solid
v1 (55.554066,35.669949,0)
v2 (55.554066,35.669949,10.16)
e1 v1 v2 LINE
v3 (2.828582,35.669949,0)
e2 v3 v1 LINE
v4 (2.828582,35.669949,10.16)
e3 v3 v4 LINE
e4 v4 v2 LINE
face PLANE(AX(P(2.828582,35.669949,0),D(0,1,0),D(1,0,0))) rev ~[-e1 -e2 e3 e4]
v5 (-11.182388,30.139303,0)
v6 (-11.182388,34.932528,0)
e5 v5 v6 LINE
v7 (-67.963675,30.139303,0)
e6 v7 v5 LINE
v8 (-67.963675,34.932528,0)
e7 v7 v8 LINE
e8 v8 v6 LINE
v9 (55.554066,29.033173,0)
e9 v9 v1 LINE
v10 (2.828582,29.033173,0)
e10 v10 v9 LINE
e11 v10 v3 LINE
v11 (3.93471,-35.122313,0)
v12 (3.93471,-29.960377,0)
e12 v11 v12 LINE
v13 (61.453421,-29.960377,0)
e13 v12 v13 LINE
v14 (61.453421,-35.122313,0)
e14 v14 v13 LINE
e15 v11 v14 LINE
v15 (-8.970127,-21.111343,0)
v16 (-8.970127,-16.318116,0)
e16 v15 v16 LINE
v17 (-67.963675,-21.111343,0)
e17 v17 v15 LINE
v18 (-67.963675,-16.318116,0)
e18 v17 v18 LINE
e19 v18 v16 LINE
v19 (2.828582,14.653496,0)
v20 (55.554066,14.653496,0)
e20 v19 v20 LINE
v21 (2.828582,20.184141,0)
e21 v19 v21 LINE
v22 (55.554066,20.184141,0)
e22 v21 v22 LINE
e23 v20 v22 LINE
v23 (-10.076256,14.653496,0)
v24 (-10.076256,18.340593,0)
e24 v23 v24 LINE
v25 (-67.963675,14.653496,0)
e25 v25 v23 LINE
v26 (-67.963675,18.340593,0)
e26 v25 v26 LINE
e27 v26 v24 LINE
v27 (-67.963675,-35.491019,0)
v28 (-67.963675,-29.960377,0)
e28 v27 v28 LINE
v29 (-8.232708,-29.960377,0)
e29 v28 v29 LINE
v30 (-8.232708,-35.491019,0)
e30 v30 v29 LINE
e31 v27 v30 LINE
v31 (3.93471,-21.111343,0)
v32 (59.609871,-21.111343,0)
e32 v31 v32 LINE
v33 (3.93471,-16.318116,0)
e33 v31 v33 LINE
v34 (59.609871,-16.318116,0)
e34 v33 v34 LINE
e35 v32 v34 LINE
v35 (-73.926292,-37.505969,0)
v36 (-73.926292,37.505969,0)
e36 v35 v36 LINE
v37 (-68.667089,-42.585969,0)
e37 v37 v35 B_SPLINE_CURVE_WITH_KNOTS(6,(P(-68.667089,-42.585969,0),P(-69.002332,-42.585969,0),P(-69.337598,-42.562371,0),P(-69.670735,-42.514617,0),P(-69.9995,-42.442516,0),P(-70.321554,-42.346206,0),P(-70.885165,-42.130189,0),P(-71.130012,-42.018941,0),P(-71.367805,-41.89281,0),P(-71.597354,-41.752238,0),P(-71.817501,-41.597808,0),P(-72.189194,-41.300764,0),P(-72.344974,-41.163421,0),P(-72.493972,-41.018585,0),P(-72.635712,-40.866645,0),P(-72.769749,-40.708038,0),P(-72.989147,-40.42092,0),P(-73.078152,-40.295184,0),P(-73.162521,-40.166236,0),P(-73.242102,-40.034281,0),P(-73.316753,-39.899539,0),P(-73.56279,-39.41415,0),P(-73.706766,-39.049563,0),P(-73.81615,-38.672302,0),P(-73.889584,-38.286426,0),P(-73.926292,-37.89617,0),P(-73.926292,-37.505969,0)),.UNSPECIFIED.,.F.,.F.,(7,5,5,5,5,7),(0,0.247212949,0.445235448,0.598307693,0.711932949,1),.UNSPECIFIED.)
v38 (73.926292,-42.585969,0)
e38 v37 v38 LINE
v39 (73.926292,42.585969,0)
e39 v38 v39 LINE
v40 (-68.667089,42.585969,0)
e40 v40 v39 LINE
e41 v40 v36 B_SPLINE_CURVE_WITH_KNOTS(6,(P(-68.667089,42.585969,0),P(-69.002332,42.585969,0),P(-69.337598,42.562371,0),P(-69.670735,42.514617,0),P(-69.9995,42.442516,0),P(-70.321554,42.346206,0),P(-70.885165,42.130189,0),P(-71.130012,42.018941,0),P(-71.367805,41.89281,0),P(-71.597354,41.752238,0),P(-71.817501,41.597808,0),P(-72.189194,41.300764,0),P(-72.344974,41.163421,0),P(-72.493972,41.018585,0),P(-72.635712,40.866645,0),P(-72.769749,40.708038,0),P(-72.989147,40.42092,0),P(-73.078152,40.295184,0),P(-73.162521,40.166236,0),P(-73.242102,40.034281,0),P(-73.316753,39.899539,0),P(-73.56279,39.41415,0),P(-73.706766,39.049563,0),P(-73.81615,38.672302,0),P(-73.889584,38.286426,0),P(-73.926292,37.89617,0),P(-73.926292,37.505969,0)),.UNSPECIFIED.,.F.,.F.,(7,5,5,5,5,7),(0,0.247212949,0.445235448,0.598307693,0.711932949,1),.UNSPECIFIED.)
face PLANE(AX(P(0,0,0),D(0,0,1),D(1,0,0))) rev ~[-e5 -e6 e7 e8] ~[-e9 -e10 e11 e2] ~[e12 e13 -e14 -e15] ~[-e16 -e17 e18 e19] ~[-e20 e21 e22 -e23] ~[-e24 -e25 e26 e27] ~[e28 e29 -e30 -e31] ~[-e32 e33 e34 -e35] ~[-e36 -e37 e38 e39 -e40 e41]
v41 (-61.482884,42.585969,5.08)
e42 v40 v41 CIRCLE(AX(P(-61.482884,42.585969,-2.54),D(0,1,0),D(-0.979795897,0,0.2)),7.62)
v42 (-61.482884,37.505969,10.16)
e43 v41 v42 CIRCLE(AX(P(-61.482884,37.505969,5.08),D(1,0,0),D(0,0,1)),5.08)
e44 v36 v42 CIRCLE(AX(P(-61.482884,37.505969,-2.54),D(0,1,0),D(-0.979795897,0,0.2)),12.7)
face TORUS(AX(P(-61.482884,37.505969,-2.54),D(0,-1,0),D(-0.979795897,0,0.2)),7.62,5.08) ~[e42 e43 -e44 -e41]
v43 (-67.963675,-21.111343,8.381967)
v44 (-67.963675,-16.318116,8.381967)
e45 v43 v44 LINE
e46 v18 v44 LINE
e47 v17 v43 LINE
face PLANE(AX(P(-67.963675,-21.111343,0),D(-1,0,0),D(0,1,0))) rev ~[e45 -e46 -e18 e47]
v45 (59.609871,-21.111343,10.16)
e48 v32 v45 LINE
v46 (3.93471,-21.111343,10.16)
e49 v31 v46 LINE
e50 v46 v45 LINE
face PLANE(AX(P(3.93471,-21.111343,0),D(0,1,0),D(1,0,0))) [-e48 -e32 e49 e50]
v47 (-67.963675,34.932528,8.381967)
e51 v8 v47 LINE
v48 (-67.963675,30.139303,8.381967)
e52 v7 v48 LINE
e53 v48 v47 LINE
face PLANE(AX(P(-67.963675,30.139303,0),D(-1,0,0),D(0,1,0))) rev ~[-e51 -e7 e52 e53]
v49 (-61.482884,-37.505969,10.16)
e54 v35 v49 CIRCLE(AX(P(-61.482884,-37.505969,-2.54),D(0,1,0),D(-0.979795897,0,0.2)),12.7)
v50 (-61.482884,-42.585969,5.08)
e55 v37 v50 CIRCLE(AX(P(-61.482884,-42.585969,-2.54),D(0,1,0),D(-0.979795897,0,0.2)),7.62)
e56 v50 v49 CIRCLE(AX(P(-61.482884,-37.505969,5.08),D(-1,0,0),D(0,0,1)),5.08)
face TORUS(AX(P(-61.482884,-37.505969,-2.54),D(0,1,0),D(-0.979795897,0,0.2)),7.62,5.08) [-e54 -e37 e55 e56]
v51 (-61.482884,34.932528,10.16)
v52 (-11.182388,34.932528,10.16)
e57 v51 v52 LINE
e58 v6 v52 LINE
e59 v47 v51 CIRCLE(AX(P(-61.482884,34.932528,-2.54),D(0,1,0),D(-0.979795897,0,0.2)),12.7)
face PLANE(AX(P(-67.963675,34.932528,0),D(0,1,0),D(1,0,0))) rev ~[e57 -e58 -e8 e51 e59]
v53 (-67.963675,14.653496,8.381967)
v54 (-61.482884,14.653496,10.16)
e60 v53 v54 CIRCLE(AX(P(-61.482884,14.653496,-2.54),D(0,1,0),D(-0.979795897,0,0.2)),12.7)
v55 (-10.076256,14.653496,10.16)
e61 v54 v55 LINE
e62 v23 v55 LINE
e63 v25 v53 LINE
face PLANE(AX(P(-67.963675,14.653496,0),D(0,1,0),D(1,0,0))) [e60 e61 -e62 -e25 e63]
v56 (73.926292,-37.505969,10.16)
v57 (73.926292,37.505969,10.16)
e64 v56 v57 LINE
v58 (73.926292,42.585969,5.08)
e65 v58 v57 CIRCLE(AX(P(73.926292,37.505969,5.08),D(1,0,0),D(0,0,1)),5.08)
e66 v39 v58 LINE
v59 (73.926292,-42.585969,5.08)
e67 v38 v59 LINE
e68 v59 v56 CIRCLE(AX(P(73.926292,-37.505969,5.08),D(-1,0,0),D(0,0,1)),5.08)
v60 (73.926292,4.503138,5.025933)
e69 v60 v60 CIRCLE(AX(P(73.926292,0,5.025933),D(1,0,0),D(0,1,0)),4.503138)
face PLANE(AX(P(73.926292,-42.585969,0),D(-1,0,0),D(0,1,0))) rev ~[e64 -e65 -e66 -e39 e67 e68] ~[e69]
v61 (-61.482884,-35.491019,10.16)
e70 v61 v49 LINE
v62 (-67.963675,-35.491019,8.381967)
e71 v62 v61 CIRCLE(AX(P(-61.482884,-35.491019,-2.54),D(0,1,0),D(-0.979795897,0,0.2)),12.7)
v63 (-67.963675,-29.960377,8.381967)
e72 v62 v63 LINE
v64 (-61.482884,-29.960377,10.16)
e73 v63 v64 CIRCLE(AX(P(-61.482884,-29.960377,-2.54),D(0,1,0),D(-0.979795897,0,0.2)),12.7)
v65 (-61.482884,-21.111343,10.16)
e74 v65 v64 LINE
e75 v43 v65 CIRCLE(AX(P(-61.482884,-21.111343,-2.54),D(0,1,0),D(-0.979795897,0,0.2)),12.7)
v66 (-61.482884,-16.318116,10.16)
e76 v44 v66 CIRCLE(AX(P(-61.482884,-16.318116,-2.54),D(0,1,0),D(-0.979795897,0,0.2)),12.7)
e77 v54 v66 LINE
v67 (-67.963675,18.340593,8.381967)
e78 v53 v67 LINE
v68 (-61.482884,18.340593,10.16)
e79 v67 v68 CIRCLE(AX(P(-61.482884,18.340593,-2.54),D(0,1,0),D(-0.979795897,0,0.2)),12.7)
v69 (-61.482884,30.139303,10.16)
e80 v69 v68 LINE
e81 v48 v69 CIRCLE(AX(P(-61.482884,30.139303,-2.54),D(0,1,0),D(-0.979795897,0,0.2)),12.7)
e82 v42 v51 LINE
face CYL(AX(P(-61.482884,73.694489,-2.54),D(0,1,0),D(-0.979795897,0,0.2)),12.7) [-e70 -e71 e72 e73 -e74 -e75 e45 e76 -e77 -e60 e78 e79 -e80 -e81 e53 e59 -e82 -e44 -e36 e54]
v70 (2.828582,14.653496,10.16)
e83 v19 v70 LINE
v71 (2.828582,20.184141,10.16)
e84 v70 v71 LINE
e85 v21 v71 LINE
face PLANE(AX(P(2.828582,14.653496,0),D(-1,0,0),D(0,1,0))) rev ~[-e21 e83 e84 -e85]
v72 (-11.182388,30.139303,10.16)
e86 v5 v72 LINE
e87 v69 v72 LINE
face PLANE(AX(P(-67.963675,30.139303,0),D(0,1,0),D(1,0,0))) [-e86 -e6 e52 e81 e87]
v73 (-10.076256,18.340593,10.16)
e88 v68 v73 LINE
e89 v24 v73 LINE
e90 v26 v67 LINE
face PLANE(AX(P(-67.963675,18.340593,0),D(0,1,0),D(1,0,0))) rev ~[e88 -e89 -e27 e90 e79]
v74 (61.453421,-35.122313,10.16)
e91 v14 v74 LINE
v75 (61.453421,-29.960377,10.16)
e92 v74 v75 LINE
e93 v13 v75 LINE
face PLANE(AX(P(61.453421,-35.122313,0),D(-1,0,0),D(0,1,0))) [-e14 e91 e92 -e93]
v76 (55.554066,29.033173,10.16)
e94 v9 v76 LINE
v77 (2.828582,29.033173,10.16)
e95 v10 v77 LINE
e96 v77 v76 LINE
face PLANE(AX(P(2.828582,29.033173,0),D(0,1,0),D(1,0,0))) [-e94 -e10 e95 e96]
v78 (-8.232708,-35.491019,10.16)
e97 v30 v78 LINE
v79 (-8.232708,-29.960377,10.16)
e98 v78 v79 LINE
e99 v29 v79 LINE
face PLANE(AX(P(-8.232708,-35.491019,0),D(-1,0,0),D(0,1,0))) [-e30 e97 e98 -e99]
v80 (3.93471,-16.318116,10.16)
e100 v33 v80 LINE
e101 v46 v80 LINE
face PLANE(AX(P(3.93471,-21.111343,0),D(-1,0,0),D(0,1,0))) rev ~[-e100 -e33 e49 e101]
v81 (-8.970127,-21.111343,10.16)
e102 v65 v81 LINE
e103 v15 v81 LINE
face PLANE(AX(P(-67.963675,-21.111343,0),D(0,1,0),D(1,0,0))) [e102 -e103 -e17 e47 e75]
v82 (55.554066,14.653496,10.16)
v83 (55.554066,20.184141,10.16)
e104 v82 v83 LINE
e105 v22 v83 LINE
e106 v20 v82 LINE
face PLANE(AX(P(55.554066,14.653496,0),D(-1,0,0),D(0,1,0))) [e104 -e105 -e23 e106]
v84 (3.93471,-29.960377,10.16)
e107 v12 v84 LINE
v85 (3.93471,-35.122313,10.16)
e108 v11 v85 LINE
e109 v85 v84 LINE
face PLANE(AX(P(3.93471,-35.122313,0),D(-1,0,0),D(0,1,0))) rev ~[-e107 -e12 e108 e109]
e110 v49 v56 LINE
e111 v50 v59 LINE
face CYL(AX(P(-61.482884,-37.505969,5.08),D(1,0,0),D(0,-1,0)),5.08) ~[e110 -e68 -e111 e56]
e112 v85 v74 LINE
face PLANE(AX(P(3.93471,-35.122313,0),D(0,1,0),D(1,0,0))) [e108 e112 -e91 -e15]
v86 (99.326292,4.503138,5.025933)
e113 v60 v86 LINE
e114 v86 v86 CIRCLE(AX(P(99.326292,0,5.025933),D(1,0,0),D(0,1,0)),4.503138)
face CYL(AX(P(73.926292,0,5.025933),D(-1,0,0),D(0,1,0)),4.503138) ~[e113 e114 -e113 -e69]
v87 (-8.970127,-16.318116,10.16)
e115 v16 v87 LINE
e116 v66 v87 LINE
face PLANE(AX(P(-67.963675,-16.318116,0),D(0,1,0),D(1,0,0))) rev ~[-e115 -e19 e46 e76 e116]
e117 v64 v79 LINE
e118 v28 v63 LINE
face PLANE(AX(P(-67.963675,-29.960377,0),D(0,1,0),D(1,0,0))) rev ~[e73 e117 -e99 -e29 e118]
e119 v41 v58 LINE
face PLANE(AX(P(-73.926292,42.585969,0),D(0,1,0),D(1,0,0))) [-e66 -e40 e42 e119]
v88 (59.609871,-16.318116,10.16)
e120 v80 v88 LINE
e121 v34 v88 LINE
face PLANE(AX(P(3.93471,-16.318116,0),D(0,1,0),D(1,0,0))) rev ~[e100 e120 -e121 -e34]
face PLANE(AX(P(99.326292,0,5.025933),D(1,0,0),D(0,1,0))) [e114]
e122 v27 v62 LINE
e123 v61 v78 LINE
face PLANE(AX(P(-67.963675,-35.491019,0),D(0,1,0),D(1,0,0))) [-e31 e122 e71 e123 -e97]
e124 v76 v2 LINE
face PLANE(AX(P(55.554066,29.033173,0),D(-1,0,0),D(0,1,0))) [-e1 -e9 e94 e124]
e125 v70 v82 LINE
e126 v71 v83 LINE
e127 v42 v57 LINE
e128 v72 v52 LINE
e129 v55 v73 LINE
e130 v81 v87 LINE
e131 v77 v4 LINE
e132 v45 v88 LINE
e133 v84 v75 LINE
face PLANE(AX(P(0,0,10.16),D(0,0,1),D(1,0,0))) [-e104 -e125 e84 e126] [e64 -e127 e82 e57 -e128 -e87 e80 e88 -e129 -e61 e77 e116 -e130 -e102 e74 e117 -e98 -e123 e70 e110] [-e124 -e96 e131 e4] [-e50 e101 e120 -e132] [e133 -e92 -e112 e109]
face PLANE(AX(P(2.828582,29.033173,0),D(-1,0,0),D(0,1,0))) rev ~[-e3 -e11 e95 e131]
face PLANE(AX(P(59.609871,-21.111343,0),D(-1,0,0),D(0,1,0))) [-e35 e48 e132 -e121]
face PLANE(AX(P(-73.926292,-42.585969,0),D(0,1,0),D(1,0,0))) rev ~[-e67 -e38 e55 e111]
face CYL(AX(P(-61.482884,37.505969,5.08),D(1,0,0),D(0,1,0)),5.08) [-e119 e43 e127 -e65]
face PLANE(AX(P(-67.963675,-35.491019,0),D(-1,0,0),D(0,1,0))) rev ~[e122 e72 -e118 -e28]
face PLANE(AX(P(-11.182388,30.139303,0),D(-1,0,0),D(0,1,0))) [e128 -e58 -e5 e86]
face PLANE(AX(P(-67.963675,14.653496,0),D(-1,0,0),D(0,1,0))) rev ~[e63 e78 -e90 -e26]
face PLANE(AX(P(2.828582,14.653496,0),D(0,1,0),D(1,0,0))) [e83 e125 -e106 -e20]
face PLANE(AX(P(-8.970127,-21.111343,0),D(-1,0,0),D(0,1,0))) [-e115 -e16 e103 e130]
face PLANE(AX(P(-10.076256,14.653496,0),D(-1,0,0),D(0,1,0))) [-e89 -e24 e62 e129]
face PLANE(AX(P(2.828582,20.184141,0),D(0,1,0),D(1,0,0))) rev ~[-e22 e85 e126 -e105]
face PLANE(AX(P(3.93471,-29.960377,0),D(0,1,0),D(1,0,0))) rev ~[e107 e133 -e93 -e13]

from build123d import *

# Parameters (mm, degrees)
F0_W        = 147.8525847197
F0_H        = 85.1719379425
F0_W_2      = 59.7309665754
F0_H_2      = 5.5306423455
F0_W_3      = 58.9935472235
F0_H_3      = 4.7932267189
F0_W_4      = 57.5187108479
F0_H_4      = 5.1619354635
F0_W_5      = 55.6751615368
F0_W_6      = 57.8874191269
F0_H_5      = 3.6870967597
F0_W_7      = 56.7812863737
F0_H_6      = 4.7932248563
F0_W_8      = 52.7254838962
F0_H_7      = 5.5306442082
F0_H_8      = 6.6367760301
F1_DEPTH    = 10.16
F2_T1_DEPTH = 147.3889774092
F3_R        = 5.08
F4_R        = 4.5031383634
F5_DEPTH    = 25.4


# Not quite as in the source:
# - a fillet or chamfer that OpenCascade refuses, or shapes differently, is made with other operations: its cross-section is extruded or revolved along the edge and cut away or added


with BuildPart() as f1:
    # F0 (on Top) → F1 (new body)
    with BuildSketch(Plane.XY):
        Rectangle(F0_W, F0_H)
        with Locations((-38.0981913768, -32.7256983146)):
            Rectangle(F0_W_2, F0_H_2, mode=Mode.SUBTRACT)
        with Locations((-38.4669010527, -18.7147296965)):
            Rectangle(F0_W_3, F0_H_3, mode=Mode.SUBTRACT)
        with Locations((32.6940652449, -32.5413448736)):
            Rectangle(F0_W_4, F0_H_4, mode=Mode.SUBTRACT)
        with Locations((31.7722905893, -18.7147296965)):
            Rectangle(F0_W_5, F0_H_3, mode=Mode.SUBTRACT)
        with Locations((-39.019965101, 16.4970448241)):
            Rectangle(F0_W_6, F0_H_5, mode=Mode.SUBTRACT)
        with Locations((-39.5730314776, 32.535915263)):
            Rectangle(F0_W_7, F0_H_6, mode=Mode.SUBTRACT)
        with Locations((29.1913239053, 17.4188185483)):
            Rectangle(F0_W_8, F0_H_7, mode=Mode.SUBTRACT)
        with Locations((29.1913239053, 32.3515608907)):
            Rectangle(F0_W_8, F0_H_8, mode=Mode.SUBTRACT)
    extrude(amount=F1_DEPTH)

    # F2: fillet of radius 12.7 on 1 edges, made by hand

    # F2_s2 → F2_t1 (cut)
    with BuildSketch(Plane.XZ.offset(-73.6944887046)):
        with BuildLine():
            ThreePointArc((-73.9262923598, 0), (-69.5150697233, 7.2973776994), (-61.4828844665, 10.16))
            Line((-61.4828844665, 10.16), (-73.9262923598, 10.16))
            Line((-73.9262923598, 10.16), (-73.9262923598, 0))
        make_face()
    extrude(amount=F2_T1_DEPTH, mode=Mode.SUBTRACT)

    # F3
    f3_edges = [f1.edges().sort_by_distance(p)[0] for p in [
        (6.221704, -42.585969, 10.16),
        (6.221704, 42.585969, 10.16),
        (-69.51507, 42.585969, 7.297378),
        (-69.51507, -42.585969, 7.297378),
    ]]
    fillet(f3_edges, radius=F3_R)

    # F4 (on face) → F5 (join)
    with BuildSketch(Plane.YZ.offset(73.9262923598)):
        with Locations((0, 5.0259334967)):
            Circle(F4_R)
    extrude(amount=F5_DEPTH)


solid = f1.part
